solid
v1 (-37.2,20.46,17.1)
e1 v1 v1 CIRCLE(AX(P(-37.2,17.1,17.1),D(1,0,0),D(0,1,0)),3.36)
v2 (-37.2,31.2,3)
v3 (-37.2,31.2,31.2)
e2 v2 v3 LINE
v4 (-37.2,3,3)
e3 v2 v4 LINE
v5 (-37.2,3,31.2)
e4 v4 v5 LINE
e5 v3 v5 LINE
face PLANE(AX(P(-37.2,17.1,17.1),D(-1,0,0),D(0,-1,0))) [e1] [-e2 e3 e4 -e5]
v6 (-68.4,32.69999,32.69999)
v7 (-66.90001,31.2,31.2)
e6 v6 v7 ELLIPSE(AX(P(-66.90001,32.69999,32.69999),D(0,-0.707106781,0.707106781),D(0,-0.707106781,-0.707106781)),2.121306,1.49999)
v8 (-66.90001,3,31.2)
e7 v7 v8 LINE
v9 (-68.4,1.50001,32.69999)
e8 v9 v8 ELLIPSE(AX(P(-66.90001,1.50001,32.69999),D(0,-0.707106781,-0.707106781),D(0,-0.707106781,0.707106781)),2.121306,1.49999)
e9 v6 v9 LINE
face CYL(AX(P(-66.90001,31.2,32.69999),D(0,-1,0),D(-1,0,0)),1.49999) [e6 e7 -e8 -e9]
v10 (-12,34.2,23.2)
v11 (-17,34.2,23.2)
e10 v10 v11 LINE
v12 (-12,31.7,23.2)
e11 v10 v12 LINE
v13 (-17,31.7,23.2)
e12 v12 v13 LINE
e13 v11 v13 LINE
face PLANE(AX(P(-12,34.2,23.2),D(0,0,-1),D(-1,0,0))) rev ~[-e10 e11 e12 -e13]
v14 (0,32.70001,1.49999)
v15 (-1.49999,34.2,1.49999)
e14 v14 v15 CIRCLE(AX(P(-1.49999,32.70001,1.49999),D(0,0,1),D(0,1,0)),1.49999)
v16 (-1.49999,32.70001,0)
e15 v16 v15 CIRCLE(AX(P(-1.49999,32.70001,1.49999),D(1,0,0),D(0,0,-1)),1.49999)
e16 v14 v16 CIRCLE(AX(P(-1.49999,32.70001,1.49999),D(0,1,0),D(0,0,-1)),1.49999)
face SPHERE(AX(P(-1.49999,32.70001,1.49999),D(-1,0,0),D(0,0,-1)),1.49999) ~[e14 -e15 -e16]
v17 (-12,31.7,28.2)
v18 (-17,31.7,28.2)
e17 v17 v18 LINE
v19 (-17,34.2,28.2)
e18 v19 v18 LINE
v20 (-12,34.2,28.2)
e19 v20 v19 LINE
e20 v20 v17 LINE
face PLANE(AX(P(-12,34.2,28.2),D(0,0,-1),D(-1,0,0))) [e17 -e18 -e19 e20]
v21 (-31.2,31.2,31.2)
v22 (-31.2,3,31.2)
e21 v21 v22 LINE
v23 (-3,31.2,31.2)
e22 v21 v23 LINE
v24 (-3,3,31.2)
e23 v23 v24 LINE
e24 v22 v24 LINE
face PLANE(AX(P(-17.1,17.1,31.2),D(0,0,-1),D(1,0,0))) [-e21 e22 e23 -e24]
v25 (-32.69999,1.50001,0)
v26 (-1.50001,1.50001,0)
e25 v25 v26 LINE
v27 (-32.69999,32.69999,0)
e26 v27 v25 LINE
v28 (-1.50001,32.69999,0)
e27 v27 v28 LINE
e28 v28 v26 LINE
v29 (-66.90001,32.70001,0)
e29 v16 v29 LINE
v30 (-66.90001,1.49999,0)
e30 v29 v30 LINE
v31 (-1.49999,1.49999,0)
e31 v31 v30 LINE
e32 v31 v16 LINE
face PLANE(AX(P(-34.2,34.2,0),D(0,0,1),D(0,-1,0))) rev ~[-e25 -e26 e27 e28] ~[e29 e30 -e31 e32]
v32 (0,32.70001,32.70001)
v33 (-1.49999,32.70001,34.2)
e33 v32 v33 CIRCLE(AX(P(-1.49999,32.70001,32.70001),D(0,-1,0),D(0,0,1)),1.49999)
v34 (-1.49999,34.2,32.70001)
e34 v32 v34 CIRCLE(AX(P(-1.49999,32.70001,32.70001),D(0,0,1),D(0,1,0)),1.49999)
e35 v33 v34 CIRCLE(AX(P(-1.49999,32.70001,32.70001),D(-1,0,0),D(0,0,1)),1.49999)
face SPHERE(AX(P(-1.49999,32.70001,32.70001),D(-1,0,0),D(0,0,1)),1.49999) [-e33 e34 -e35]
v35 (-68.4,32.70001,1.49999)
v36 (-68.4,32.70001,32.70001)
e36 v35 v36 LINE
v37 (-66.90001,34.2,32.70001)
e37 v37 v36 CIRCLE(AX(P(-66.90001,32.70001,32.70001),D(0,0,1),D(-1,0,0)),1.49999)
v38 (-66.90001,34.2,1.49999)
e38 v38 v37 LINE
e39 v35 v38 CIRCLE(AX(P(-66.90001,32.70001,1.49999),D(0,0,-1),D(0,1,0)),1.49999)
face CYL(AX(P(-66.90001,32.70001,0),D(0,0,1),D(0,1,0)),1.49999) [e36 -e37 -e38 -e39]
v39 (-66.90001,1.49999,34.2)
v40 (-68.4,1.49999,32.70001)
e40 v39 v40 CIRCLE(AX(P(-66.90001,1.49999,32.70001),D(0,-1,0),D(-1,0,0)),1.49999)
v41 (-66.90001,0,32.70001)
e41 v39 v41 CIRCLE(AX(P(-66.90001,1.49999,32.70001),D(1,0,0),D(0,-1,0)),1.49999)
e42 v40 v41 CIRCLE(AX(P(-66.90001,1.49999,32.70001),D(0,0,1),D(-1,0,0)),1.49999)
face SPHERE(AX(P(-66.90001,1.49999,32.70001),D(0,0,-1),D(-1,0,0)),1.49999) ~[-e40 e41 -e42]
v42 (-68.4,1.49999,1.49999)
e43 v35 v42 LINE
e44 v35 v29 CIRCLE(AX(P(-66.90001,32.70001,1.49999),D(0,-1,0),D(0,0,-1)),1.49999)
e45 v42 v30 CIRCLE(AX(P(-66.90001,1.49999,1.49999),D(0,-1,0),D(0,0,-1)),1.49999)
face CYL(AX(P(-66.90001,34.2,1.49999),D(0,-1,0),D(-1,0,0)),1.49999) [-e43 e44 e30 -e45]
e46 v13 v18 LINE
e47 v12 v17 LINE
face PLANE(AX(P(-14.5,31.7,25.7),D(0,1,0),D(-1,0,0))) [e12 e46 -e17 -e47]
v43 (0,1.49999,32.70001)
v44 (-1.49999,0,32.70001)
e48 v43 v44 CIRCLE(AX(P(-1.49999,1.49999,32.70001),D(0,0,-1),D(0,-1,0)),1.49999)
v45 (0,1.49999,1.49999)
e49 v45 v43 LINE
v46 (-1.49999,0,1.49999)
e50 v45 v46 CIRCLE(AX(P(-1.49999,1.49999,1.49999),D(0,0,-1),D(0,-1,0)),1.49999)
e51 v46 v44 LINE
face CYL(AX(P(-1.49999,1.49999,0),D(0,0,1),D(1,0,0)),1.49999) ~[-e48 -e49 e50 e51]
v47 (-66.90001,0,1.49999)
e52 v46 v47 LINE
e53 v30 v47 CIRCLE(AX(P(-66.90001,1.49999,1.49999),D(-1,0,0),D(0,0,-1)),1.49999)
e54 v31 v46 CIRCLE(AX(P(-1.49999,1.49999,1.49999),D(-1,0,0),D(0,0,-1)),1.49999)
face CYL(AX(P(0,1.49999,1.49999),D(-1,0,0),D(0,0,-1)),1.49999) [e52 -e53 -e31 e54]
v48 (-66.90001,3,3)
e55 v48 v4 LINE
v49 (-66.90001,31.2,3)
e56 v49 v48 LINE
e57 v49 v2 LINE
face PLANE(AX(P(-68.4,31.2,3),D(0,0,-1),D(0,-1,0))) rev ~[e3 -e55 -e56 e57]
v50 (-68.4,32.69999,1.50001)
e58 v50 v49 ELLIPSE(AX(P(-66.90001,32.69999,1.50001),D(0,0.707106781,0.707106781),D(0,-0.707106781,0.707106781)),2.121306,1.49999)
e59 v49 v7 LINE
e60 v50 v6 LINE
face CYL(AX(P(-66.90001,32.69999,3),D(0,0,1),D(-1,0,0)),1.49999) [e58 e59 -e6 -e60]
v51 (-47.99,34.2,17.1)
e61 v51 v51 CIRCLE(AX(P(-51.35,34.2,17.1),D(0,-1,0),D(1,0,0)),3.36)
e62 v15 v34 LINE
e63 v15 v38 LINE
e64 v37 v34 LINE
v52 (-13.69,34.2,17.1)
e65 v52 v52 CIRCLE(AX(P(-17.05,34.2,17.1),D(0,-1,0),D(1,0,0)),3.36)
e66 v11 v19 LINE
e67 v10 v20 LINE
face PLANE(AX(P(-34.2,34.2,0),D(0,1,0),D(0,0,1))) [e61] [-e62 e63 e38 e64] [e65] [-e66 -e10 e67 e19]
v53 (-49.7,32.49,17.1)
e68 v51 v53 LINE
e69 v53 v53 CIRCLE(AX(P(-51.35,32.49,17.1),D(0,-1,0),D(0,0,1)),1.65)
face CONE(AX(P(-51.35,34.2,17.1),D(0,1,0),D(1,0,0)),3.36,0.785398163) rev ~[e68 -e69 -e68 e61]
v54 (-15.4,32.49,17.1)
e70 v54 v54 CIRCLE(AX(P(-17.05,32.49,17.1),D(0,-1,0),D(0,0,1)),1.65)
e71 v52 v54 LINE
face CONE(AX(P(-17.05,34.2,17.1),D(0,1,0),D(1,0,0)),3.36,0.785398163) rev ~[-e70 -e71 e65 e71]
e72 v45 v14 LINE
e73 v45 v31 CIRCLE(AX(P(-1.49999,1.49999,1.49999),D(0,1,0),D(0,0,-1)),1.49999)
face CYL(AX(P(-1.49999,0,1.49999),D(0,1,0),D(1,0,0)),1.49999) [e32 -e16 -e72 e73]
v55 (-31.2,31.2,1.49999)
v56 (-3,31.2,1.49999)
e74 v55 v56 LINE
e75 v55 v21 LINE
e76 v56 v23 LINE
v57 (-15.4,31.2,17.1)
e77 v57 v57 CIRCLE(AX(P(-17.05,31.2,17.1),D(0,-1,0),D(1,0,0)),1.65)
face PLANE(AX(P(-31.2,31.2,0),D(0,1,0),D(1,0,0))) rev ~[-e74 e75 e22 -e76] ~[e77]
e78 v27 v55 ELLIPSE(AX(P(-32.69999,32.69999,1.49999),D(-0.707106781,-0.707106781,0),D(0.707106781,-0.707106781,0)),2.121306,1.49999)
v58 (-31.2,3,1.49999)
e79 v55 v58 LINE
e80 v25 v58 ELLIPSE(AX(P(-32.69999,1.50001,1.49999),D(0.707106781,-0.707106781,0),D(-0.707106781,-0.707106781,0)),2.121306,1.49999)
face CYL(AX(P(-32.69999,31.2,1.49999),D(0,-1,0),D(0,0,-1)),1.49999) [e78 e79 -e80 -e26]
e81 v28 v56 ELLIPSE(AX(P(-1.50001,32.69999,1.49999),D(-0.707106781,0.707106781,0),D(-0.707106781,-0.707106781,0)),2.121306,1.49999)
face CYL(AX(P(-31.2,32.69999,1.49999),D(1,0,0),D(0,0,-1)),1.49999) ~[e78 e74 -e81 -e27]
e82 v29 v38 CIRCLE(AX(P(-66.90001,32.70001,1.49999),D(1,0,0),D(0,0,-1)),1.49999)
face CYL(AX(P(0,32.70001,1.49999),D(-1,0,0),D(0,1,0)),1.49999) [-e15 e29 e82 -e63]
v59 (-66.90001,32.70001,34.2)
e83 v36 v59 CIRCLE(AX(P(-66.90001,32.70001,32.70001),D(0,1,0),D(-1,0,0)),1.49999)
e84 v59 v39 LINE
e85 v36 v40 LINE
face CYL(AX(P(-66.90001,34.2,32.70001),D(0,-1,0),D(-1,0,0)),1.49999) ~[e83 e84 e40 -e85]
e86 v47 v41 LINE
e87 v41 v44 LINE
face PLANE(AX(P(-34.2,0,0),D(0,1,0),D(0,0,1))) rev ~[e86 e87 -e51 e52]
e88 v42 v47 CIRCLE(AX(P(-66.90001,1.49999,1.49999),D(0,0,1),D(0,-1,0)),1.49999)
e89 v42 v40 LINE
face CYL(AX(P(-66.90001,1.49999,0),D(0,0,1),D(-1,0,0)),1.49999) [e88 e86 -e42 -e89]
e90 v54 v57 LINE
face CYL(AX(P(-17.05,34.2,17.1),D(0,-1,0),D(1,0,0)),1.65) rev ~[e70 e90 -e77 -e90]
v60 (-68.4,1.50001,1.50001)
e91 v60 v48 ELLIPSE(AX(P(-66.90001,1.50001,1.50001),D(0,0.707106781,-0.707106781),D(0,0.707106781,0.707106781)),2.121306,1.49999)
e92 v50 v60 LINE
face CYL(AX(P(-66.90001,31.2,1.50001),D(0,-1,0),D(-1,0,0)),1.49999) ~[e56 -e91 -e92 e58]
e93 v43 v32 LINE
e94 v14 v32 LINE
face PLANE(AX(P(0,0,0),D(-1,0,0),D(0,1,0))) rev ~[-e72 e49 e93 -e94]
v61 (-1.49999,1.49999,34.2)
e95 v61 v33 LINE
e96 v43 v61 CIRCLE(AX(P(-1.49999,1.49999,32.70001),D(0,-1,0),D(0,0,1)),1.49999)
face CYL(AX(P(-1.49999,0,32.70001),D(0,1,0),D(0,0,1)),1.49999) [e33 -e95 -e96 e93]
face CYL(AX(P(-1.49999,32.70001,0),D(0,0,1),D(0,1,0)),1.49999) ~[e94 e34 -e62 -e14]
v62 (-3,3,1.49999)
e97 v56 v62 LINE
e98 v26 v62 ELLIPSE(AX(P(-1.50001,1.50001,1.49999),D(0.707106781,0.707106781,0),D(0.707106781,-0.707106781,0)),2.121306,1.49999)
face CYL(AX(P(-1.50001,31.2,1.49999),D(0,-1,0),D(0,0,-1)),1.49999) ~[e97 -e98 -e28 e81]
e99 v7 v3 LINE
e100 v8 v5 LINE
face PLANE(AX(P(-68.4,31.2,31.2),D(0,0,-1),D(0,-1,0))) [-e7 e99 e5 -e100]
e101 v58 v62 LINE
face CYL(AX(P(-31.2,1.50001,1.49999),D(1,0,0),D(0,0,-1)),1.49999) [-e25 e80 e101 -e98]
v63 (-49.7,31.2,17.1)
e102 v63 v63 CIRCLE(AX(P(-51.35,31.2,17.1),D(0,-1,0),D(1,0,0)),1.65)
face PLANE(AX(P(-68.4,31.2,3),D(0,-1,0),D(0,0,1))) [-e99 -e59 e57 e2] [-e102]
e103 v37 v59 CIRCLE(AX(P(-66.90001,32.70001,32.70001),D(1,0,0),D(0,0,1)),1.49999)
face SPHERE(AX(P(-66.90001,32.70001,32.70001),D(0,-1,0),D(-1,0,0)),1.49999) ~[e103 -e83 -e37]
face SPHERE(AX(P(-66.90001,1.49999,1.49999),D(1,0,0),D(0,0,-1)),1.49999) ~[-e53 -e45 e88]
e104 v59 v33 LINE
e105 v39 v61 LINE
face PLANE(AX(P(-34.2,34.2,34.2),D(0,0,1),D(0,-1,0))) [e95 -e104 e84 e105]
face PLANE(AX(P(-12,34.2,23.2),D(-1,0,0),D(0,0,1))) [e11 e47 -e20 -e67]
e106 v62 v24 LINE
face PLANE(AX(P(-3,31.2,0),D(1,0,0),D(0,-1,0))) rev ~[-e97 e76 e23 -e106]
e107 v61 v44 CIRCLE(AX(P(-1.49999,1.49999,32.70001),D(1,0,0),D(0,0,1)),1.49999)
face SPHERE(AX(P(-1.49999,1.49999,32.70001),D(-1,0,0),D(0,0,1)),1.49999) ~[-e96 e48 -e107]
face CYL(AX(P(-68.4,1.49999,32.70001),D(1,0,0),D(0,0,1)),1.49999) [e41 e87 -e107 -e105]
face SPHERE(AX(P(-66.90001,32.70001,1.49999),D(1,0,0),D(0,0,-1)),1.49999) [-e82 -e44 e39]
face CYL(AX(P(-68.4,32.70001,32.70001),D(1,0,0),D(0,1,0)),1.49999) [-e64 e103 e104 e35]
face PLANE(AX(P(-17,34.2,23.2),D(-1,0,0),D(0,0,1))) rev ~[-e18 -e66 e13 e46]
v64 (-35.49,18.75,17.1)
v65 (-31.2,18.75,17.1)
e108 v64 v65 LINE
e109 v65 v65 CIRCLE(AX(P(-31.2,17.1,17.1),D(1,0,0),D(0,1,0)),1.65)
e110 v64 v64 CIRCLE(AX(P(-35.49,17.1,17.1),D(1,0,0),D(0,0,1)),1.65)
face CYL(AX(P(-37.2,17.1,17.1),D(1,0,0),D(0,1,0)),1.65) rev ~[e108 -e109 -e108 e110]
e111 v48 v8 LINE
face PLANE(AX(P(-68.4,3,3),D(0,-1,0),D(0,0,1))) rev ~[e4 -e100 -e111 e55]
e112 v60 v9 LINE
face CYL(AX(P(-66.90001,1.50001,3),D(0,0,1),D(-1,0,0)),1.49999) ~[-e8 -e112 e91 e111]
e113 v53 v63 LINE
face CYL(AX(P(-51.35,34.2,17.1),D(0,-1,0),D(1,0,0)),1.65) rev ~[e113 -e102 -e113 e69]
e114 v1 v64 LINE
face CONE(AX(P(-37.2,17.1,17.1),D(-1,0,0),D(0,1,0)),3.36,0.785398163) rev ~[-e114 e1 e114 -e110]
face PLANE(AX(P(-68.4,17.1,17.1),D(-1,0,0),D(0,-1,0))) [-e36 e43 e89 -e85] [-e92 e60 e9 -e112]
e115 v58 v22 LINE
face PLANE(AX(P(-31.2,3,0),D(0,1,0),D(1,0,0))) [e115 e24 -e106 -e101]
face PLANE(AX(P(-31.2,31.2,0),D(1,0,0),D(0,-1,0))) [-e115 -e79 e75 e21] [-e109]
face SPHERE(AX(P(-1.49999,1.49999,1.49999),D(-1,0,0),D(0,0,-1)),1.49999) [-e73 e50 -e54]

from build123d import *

# Parameters (mm, degrees)
F1_DEPTH             = 34.2
F2_W                 = 34.2
F2_H                 = 34.2
F3_DEPTH             = 34.2
F4_W                 = 28.2
F4_H                 = 28.2
F5_DEPTH             = 31.2
F8_D                 = 3.3
F8_DEPTH             = 25
F8_CSINK_D           = 6.72
F8_CSINK_ANGLE       = 90
F8_TIP               = 0.9914200214
F8_ON_F7_D           = 3.3
F8_ON_F7_DEPTH       = 25
F8_ON_F7_CSINK_D     = 6.72
F8_ON_F7_CSINK_ANGLE = 90
F8_ON_F7_TIP         = 0.9914200214
F9_W                 = 28.2
F9_H                 = 28.2
F10_DEPTH            = 31.2
F11_R                = 1.49999
F12_W                = 5
F12_H                = 5
F13_DEPTH            = 2.5


# Not quite as in the source:
# - a fillet or chamfer is up to 0.001 mm smaller than in the source, because OpenCascade refuses the exact size
# - a feature names something its author has since deleted; it is built from what else it names


with BuildPart() as f1:
    # F0 (on Top) → F1 (new body)
    with BuildSketch(Plane.XY):
        Polygon((-34.2, 0), (-8, 0), (0, 0), (0, 34.2), (-34.2, 34.2), align=None)
    extrude(amount=F1_DEPTH)

    # F2 (on face) → F3 (join)
    with BuildSketch(Plane(origin=(-34.2, 0, 0), x_dir=(0, -1, 0), z_dir=(-1, 0, 0))):
        with Locations((-17.1, 17.1)):
            Rectangle(F2_W, F2_H)
    extrude(amount=F3_DEPTH)

    # F4 (on face) → F5 (cut)
    with BuildSketch(Plane(origin=(-68.4, 0, 0), x_dir=(0, -1, 0), z_dir=(-1, 0, 0))):
        with Locations((-17.1, 17.1)):
            Rectangle(F4_W, F4_H)
    extrude(amount=-F5_DEPTH, mode=Mode.SUBTRACT)

    # F8
    with Locations(Plane(origin=(0, 34.2, 0), x_dir=(-1, 0, 0), z_dir=(0, 1, 0))):
        with Locations((17.05, 17.1), (51.35, 17.1)):
            CounterSinkHole(F8_D / 2, F8_CSINK_D / 2, depth=F8_DEPTH, counter_sink_angle=F8_CSINK_ANGLE)
            with Locations((0, 0, -(F8_DEPTH + F8_TIP / 2))):  # 118° drill point
                Cone(0, F8_D / 2, F8_TIP, mode=Mode.SUBTRACT)

    # F8 on F7
    with Locations(Plane(origin=(-37.2, 0, 0), x_dir=(0, -1, 0), z_dir=(-1, 0, 0))):
        with Locations((-17.1, 17.1)):
            CounterSinkHole(F8_ON_F7_D / 2, F8_ON_F7_CSINK_D / 2, depth=F8_ON_F7_DEPTH, counter_sink_angle=F8_ON_F7_CSINK_ANGLE)
            with Locations((0, 0, -(F8_ON_F7_DEPTH + F8_ON_F7_TIP / 2))):  # 118° drill point
                Cone(0, F8_ON_F7_D / 2, F8_ON_F7_TIP, mode=Mode.SUBTRACT)

    # F9 (on face) → F10 (cut)
    with BuildSketch(Plane(origin=(0, 0, 0), x_dir=(1, 0, 0), z_dir=(0, 0, -1))):
        with Locations((-17.1, -17.1)):
            Rectangle(F9_W, F9_H)
    extrude(amount=-F10_DEPTH, mode=Mode.SUBTRACT)

    # F11 (radius 1.5 in the source; OpenCascade refuses exactly that, so slightly less here)
    f11_edges = [f1.edges().sort_by_distance(p)[0] for p in [
        (-31.2, 17.1, 0),
        (-17.1, 3, 0),
        (-3, 17.1, 0),
        (-17.1, 31.2, 0),
        (-34.2, 34.2, 0),
        (-34.2, 0, 0),
        (0, 17.1, 0),
        (-68.4, 17.1, 0),
        (-68.4, 0, 17.1),
        (-68.4, 17.1, 34.2),
        (-68.4, 34.2, 17.1),
        (-68.4, 17.1, 31.2),
        (-68.4, 3, 17.1),
        (-68.4, 17.1, 3),
        (-68.4, 31.2, 17.1),
        (-34.2, 0, 34.2),
        (-34.2, 34.2, 34.2),
        (0, 17.1, 34.2),
        (0, 34.2, 17.1),
        (0, 0, 17.1),
    ]]
    fillet(f11_edges, radius=F11_R)

    # F12 (on face) → F13 (cut)
    with BuildSketch(Plane(origin=(0, 34.2, 0), x_dir=(-1, 0, 0), z_dir=(0, 1, 0))):
        with Locations((14.5, 25.7)):
            Rectangle(F12_W, F12_H)
    extrude(amount=-F13_DEPTH, mode=Mode.SUBTRACT)


solid = f1.part
